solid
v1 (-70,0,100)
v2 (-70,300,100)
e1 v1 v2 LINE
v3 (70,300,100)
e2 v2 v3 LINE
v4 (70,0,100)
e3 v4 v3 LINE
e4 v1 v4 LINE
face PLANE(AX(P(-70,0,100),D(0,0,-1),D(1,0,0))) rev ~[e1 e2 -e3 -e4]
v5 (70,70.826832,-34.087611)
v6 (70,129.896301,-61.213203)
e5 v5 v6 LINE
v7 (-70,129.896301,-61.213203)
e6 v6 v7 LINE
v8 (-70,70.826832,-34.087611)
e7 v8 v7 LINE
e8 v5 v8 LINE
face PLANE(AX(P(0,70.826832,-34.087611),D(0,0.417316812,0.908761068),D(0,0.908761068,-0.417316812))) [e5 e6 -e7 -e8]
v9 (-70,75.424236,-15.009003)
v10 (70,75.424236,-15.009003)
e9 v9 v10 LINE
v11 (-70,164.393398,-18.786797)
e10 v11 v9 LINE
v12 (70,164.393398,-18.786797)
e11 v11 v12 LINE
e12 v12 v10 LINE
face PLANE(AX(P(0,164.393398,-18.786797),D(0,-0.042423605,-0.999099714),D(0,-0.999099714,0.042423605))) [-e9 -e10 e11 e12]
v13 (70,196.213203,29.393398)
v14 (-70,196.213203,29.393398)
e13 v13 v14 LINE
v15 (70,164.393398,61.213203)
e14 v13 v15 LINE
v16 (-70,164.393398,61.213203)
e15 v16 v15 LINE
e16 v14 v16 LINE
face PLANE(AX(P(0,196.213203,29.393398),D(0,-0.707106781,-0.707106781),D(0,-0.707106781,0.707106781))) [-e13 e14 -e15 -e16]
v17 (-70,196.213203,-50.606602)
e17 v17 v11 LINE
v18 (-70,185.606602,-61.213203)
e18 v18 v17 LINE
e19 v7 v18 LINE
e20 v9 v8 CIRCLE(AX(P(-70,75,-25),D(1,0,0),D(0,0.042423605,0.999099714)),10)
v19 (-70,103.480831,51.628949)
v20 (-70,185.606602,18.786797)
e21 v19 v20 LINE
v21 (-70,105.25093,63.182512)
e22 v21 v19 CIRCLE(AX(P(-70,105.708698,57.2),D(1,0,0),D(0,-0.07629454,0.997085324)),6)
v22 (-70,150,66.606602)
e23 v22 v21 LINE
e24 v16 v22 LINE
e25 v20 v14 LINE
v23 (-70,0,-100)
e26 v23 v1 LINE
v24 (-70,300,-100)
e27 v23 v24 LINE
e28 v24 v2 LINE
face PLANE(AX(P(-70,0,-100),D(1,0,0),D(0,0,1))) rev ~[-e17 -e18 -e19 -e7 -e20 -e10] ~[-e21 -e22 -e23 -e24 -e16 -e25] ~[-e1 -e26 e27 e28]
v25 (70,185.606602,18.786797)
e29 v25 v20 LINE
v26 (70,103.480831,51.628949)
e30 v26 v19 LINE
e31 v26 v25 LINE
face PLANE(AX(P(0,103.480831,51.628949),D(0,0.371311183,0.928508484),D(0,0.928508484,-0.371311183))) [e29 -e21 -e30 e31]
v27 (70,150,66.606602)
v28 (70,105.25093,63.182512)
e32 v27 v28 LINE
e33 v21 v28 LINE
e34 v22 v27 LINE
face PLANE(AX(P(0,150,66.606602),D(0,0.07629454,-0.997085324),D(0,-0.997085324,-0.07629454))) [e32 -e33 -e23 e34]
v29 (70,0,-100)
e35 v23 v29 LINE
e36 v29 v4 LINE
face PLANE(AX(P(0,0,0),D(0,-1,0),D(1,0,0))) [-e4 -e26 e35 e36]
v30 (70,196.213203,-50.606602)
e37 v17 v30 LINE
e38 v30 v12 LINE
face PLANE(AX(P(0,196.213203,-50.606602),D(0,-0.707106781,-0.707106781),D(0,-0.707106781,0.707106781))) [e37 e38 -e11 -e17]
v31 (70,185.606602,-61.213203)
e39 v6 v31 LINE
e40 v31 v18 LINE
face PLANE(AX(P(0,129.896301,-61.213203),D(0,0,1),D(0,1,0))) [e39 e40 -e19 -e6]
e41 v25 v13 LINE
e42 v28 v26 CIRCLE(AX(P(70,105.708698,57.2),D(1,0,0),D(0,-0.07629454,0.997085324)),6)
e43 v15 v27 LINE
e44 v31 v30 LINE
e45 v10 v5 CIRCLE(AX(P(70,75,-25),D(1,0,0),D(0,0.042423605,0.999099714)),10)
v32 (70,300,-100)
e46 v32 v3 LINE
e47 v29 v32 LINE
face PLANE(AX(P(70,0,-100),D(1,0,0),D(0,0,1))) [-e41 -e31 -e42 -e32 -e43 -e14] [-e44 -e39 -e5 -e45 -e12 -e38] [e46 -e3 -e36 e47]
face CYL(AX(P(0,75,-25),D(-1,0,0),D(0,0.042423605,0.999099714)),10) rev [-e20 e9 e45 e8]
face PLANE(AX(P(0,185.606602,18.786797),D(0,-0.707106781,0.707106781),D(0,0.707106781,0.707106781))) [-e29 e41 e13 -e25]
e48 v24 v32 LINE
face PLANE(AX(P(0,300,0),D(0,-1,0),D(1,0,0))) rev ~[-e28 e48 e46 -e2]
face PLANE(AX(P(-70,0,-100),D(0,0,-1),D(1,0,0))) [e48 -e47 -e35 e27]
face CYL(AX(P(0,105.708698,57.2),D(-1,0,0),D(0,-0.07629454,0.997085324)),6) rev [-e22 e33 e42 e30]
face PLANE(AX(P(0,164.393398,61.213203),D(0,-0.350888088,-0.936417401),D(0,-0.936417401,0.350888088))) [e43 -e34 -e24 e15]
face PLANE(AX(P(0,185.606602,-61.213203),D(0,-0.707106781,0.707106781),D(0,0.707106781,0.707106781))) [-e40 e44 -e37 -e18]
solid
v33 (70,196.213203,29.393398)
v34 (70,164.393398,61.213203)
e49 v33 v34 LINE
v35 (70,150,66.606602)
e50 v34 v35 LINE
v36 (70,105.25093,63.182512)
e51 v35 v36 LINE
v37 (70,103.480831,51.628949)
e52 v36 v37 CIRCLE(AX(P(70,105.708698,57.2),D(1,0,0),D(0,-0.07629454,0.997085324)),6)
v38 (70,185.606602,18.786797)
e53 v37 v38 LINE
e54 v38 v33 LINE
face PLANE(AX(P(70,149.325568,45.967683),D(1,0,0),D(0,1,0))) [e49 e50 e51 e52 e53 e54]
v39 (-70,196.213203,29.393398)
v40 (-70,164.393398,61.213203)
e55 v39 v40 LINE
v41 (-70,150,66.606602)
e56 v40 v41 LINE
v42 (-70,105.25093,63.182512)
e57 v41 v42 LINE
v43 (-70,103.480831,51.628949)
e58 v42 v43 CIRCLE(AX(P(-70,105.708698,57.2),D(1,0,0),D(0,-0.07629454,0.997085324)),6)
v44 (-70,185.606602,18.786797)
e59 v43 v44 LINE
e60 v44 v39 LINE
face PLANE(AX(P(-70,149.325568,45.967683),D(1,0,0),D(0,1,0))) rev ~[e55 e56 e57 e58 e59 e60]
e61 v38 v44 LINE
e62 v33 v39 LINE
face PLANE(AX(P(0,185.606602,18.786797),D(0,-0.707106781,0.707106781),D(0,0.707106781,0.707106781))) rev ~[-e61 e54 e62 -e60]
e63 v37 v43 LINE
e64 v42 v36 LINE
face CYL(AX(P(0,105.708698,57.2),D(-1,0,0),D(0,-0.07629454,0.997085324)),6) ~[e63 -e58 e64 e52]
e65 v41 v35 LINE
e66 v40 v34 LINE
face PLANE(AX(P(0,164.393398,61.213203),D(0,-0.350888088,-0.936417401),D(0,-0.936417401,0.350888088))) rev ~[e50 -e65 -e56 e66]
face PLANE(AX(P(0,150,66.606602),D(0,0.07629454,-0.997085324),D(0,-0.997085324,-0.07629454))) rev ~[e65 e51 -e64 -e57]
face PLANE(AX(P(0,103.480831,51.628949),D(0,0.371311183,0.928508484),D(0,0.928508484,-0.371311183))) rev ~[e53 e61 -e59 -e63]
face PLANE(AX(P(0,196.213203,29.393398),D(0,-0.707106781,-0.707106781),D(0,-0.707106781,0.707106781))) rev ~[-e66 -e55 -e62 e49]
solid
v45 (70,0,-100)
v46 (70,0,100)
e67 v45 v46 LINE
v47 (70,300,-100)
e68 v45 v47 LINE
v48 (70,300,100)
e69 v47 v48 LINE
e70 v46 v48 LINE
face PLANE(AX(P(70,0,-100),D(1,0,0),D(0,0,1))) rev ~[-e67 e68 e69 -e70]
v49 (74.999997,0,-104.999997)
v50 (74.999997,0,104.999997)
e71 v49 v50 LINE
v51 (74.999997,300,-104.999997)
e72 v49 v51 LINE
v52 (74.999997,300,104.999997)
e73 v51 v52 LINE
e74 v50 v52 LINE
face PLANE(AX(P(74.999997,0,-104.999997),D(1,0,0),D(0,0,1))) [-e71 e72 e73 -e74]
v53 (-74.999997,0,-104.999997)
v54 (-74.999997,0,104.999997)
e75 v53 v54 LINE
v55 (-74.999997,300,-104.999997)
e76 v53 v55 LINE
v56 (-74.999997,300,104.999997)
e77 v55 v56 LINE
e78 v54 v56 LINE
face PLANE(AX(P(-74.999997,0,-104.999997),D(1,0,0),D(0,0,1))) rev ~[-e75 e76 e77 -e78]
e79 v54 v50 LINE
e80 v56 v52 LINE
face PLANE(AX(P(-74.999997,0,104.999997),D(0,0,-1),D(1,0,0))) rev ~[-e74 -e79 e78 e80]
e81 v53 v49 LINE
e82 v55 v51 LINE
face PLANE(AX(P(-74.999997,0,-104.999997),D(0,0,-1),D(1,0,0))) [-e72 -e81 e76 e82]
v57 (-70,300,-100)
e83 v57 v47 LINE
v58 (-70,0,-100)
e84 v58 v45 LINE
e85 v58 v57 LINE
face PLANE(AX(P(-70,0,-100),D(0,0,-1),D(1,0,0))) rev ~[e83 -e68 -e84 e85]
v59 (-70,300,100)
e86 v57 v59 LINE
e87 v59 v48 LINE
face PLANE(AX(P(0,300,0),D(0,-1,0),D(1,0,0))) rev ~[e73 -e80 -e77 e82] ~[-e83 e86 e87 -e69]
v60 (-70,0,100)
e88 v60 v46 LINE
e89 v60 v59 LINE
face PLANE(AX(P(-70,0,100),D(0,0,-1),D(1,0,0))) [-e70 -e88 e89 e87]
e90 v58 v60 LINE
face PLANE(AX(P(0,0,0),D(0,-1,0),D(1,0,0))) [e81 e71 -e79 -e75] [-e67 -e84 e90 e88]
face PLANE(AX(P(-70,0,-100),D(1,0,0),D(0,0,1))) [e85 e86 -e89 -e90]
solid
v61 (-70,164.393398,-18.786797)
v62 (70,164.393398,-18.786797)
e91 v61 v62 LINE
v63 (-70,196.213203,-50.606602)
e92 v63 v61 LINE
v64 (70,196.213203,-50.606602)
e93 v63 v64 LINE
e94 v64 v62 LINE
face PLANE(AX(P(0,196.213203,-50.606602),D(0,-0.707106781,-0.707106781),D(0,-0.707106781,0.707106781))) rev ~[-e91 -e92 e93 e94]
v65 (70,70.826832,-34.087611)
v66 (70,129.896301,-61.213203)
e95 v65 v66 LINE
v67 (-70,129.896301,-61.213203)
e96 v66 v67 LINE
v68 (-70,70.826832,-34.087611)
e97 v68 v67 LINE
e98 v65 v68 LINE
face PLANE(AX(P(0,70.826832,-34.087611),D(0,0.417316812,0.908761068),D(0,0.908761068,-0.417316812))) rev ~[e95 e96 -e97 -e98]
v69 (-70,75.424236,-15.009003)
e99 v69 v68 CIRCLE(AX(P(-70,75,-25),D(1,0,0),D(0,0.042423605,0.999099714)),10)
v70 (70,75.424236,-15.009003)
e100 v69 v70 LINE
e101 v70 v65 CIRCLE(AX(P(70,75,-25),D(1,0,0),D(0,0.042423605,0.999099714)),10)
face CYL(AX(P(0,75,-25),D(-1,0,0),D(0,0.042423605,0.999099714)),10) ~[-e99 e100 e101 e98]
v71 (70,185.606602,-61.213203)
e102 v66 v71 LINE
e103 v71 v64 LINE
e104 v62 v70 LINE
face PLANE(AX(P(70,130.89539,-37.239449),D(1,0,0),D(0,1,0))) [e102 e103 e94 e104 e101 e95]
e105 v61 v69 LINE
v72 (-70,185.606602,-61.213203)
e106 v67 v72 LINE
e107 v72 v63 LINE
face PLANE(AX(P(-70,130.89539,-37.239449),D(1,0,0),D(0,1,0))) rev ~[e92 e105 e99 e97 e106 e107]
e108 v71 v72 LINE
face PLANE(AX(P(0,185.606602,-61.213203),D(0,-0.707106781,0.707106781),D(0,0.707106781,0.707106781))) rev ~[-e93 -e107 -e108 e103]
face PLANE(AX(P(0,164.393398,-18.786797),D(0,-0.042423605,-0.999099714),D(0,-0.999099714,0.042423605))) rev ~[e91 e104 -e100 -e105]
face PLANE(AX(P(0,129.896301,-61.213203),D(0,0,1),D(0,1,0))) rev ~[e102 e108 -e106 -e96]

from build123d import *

# Parameters (mm, degrees)
F0_W          = 149.9999934435
F0_H          = 209.9999934435
F0_W_2        = 140
F0_H_2        = 200
F1_DEPTH      = 300
F3_DEPTH      = 70
F3_DEPTH_BACK = 70
F4_DEPTH      = 70
F4_DEPTH_BACK = 70
F5_W          = 140
F5_H          = 200
F6_DEPTH      = 300


with BuildPart() as f1:
    # F0 (on Front) → F1 (new body)
    with BuildSketch(Plane.XZ):
        Rectangle(F0_W, F0_H)
        Rectangle(F0_W_2, F0_H_2, mode=Mode.SUBTRACT)
    extrude(amount=-F1_DEPTH)


with BuildPart() as f3:
    # F2 (on Right) → F3 (new body, two sides)
    with BuildSketch(Plane.YZ) as f3_sk:
        with BuildLine():
            Line((196.2132034356, 29.3933982822), (164.3933982822, 61.2132034356))
            Line((164.3933982822, 61.2132034356), (150, 66.6066017178))
            Line((150, 66.6066017178), (105.2509304011, 63.1825119437))
            ThreePointArc((105.2509304011, 63.1825119437), (99.7778999204, 58.1086464805), (103.4808305396, 51.6289490947))
            Line((103.4808305396, 51.6289490947), (185.6066017178, 18.7867965644))
            Line((185.6066017178, 18.7867965644), (196.2132034356, 29.3933982822))
        make_face()
    extrude(amount=-F3_DEPTH)
    extrude(f3_sk.sketch, amount=F3_DEPTH_BACK)


with BuildPart() as f4:
    # F2 (on Right) → F4 (new body, two sides)
    with BuildSketch(Plane.YZ) as f4_sk:
        with BuildLine():
            Line((185.6066017178, -61.2132034356), (196.2132034356, -50.6066017178))
            Line((196.2132034356, -50.6066017178), (164.3933982822, -18.7867965644))
            Line((164.3933982822, -18.7867965644), (75.424236051, -15.0090028639))
            ThreePointArc((75.424236051, -15.0090028639), (65.2782747437, -22.6573395378), (70.8268318838, -34.0876106801))
            Line((70.8268318838, -34.0876106801), (129.8963013047, -61.2132034356))
            Line((129.8963013047, -61.2132034356), (185.6066017178, -61.2132034356))
        make_face()
    extrude(amount=-F4_DEPTH)
    extrude(f4_sk.sketch, amount=F4_DEPTH_BACK)


with BuildPart() as f6:
    # F5 (on Front) → F6 (new body)
    with BuildSketch(Plane.XZ):
        Rectangle(F5_W, F5_H)
    extrude(amount=-F6_DEPTH)

    # F7: cut F3, F4
    add(f3.part, mode=Mode.SUBTRACT)
    add(f4.part, mode=Mode.SUBTRACT)


solid = Compound([f1.part, f3.part, f4.part, f6.part])
